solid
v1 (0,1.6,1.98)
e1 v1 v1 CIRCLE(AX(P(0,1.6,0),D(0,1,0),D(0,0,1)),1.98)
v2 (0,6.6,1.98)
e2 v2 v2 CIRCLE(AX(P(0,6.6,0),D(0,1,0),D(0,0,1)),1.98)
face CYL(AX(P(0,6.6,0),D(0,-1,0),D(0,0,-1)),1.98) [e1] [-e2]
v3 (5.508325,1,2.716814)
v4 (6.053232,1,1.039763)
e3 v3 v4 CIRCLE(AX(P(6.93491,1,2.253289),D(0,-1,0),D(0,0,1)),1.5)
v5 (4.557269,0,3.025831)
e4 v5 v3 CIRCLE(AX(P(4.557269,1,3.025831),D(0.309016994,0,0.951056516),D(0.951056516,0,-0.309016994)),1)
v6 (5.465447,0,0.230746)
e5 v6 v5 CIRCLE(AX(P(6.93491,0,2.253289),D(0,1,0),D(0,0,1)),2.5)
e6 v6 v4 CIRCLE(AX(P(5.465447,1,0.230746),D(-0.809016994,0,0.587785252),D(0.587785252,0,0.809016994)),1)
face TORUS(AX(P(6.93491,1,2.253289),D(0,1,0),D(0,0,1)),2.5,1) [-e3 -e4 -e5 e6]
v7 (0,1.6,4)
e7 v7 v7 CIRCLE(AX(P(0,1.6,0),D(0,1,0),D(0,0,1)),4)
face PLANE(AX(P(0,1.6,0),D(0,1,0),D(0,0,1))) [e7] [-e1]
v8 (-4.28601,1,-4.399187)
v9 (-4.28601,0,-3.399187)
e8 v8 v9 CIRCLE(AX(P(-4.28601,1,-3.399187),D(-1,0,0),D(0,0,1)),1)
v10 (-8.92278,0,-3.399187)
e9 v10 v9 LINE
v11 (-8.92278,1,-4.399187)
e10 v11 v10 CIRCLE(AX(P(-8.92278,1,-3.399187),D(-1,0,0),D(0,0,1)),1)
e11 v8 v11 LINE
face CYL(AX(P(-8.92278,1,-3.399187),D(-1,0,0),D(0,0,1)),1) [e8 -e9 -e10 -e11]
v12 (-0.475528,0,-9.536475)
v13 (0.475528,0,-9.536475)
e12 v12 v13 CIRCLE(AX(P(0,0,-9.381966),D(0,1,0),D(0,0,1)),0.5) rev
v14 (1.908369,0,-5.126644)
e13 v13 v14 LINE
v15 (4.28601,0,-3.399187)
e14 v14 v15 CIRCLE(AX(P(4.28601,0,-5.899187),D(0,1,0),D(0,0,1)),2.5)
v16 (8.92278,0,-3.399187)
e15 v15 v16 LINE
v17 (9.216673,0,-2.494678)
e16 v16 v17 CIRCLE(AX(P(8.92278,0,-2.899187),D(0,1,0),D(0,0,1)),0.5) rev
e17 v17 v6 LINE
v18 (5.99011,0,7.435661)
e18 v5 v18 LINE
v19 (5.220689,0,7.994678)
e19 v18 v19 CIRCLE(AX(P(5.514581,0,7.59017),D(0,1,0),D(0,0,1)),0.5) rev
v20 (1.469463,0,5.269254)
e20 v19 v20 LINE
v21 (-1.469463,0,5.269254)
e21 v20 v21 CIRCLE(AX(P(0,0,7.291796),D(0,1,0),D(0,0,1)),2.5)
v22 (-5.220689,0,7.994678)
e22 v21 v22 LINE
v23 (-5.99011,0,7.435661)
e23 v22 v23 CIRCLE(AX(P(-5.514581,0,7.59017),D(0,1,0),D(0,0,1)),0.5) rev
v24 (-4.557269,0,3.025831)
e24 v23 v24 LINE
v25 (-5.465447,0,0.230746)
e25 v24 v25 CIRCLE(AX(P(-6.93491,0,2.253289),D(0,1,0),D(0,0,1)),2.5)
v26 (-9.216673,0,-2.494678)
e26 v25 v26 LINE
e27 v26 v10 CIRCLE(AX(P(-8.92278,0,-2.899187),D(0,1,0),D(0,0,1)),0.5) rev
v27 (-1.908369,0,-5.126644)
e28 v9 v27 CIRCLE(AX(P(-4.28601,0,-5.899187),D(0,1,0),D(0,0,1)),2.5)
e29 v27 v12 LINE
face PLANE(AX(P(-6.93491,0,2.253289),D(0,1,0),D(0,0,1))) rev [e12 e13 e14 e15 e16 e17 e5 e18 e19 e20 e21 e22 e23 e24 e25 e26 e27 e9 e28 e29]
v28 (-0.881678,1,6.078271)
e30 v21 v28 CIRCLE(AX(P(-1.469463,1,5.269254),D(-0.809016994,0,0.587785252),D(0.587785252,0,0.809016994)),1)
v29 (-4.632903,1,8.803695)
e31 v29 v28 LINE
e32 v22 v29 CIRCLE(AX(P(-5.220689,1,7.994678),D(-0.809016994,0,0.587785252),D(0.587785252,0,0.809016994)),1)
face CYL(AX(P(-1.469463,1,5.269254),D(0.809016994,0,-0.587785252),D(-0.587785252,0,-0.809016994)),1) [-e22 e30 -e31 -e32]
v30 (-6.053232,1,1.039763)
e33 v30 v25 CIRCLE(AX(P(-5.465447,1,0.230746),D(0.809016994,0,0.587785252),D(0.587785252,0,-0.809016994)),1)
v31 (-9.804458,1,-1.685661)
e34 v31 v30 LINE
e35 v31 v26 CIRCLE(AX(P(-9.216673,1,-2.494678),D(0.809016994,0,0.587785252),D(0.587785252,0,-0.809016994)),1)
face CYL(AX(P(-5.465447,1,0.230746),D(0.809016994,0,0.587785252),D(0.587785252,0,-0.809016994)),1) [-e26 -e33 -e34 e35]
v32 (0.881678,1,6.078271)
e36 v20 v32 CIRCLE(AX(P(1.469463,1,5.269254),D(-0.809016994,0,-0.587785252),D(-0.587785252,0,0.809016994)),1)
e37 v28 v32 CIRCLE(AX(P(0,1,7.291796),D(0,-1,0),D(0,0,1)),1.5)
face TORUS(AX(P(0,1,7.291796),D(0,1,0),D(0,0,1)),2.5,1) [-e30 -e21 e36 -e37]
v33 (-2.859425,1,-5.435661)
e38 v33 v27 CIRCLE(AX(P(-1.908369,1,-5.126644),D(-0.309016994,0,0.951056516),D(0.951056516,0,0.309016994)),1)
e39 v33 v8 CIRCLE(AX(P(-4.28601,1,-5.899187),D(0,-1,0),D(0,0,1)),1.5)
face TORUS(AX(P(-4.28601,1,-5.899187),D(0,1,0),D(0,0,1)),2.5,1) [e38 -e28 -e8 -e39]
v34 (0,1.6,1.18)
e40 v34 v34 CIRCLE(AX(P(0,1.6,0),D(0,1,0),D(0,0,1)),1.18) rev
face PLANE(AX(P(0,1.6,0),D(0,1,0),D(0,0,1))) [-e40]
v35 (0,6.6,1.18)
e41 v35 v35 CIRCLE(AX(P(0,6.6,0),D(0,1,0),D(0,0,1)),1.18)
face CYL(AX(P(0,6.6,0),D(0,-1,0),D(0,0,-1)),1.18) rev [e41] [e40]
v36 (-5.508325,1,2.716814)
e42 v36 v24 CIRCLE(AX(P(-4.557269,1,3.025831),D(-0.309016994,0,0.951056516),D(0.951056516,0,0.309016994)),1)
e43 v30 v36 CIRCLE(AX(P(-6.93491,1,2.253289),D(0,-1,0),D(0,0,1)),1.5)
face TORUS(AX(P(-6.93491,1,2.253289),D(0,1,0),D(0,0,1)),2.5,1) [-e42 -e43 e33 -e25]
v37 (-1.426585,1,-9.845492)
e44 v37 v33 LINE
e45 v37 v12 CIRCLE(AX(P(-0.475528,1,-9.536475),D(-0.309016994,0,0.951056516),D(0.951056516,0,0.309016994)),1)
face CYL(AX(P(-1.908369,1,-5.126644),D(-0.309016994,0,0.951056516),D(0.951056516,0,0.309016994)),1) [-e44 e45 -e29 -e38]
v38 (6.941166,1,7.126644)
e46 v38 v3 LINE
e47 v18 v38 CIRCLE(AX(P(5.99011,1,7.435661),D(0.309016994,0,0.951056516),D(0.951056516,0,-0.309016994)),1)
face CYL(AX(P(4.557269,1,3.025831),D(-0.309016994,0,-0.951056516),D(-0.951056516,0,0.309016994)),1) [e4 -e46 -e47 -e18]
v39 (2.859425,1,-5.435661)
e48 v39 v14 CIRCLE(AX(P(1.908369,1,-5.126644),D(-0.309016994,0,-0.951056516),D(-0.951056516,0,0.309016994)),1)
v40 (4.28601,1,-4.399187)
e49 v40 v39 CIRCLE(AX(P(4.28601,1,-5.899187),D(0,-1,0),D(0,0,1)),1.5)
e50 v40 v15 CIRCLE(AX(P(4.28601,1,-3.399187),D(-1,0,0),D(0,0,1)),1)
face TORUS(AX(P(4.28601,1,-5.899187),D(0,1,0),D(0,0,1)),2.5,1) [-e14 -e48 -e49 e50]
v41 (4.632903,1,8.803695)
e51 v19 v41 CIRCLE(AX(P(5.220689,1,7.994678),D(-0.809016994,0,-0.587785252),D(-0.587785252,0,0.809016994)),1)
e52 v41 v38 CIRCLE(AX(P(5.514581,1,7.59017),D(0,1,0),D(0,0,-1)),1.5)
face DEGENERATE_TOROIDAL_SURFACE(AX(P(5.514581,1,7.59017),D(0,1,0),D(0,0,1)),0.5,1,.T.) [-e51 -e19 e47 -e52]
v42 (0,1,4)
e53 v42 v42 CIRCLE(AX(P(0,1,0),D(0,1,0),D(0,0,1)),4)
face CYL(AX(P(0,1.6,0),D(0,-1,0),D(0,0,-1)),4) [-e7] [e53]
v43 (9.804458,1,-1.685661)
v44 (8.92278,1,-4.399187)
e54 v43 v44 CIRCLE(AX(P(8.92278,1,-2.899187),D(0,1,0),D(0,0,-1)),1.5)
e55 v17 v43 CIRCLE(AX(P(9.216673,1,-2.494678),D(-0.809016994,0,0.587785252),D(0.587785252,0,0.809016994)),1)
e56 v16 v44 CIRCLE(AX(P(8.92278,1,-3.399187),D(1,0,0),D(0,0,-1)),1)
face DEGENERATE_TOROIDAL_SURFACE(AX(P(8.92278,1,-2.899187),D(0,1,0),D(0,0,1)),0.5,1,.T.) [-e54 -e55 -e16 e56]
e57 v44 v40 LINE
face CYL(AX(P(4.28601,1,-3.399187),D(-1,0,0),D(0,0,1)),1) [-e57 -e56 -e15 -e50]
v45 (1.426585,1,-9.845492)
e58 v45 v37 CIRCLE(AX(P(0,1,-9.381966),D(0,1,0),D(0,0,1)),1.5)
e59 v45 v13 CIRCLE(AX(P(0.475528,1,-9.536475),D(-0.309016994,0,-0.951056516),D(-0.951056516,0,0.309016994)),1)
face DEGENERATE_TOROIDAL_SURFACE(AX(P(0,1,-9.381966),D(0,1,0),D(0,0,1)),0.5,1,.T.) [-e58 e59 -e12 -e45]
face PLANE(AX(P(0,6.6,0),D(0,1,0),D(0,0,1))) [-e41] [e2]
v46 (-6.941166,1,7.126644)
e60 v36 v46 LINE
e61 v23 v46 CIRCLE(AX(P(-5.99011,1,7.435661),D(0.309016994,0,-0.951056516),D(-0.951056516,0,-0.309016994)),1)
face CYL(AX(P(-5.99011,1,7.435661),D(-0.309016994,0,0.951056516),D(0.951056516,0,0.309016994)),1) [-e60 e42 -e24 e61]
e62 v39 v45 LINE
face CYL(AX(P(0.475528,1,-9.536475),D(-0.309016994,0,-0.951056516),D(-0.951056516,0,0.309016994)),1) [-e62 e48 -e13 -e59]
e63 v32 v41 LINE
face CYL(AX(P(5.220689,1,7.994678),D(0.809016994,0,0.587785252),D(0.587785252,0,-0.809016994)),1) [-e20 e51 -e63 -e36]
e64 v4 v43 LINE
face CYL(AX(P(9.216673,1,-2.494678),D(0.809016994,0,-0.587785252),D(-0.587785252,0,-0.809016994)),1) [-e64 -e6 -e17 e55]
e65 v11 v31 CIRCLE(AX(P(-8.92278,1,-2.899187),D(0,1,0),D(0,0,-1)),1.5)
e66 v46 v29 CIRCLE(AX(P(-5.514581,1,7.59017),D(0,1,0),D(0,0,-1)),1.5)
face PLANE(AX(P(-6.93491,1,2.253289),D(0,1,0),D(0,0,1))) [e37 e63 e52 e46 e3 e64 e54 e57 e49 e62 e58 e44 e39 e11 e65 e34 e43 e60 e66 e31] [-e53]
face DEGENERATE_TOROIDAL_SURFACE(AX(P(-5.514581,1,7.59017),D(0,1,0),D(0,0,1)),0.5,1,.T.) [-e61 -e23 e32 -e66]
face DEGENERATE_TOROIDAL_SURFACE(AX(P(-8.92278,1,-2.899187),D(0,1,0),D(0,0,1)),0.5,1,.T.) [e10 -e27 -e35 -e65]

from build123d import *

# Parameters (mm, degrees)
SALIENTE_EXTRUIR1_DEPTH = 1
REDONDEO1_R             = 1
CROQUIS5_R              = 4
SALIENTE_EXTRUIR5_DEPTH = 0.6
CROQUIS2_R              = 1.98
CROQUIS2_R_2            = 1.18
SALIENTE_EXTRUIR2_DEPTH = 5


with BuildPart() as part:
    # Croquis1 → Saliente-Extruir1 (new body)
    with BuildSketch(Plane(origin=(0, 0, 0), x_dir=(1, 0, 0), z_dir=(0, 1, 0))):
        with BuildLine():
            Line((1.426584774, 9.845491503), (2.859425417, 5.435661447))
            ThreePointArc((2.859425417, 5.435661447), (3.404332313, 4.685661447), (4.286010191, 4.399186938))
            Line((4.286010191, 4.399186938), (8.922779911, 4.399186938))
            ThreePointArc((8.922779911, 4.399186938), (10.349364685, 3.36271243), (9.804457789, 1.685661447))
            Line((9.804457789, 1.685661447), (6.053232287, -1.039763413))
            ThreePointArc((6.053232287, -1.039763413), (5.508325391, -1.789763413), (5.508325391, -2.716814396))
            Line((5.508325391, -2.716814396), (6.941166033, -7.126644452))
            ThreePointArc((6.941166033, -7.126644452), (6.396259137, -8.803695435), (4.63290338, -8.803695435))
            Line((4.63290338, -8.803695435), (0.881677878, -6.078270576))
            ThreePointArc((0.881677878, -6.078270576), (0, -5.791796068), (-0.881677878, -6.078270576))
            Line((-0.881677878, -6.078270576), (-4.63290338, -8.803695435))
            ThreePointArc((-4.63290338, -8.803695435), (-6.396259137, -8.803695435), (-6.941166033, -7.126644452))
            Line((-6.941166033, -7.126644452), (-5.508325391, -2.716814396))
            ThreePointArc((-5.508325391, -2.716814396), (-5.508325391, -1.789763413), (-6.053232287, -1.039763413))
            Line((-6.053232287, -1.039763413), (-9.804457789, 1.685661447))
            ThreePointArc((-9.804457789, 1.685661447), (-10.349364685, 3.36271243), (-8.922779911, 4.399186938))
            Line((-8.922779911, 4.399186938), (-4.286010191, 4.399186938))
            ThreePointArc((-4.286010191, 4.399186938), (-3.404332313, 4.685661447), (-2.859425417, 5.435661447))
            Line((-2.859425417, 5.435661447), (-1.426584774, 9.845491503))
            ThreePointArc((-1.426584774, 9.845491503), (0, 10.881966011), (1.426584774, 9.845491503))
        make_face()
    extrude(amount=SALIENTE_EXTRUIR1_DEPTH)

    # Redondeo1
    redondeo1_edges = [part.edges().sort_by_distance(p)[0] for p in [
        (-6.224745712, 0, 4.921729424),
        (-6.396259137, 0, 8.803695435),
        (-2.757290629, 0, 7.440983006),
        (0, 0, 5.791796068),
        (2.757290629, 0, 7.440983006),
        (6.396259137, 0, 8.803695435),
        (6.224745712, 0, 4.921729424),
        (5.508325391, 0, 1.789763413),
        (7.928845038, 0, -0.322949017),
        (10.349364685, 0, -3.36271243),
        (6.604395051, 0, -4.399186938),
        (3.404332313, 0, -4.685661447),
        (2.143005096, 0, -7.640576475),
        (0, 0, -10.881966011),
        (-2.143005096, 0, -7.640576475),
        (-3.404332313, 0, -4.685661447),
        (-6.604395051, 0, -4.399186938),
        (-10.349364685, 0, -3.36271243),
        (-7.928845038, 0, -0.322949017),
        (-5.508325391, 0, 1.789763413),
    ]]
    fillet(redondeo1_edges, radius=REDONDEO1_R - 0.0001)  # a hair under: the kernel refuses the full size

    # Croquis5 → Saliente-Extruir5 (add)
    with BuildSketch(Plane(origin=(0, 1, 0), x_dir=(1, 0, 0), z_dir=(0, 1, 0))):
        with Locations(Location((0, 0, 0), (0, 0, 270))):
            Circle(CROQUIS5_R)
    extrude(amount=SALIENTE_EXTRUIR5_DEPTH)

    # Croquis2 → Saliente-Extruir2 (add)
    with BuildSketch(Plane(origin=(0, 1.6, 0), x_dir=(1, 0, 0), z_dir=(0, 1, 0))):
        with Locations(Location((0, 0, 0), (0, 0, 270))):
            Circle(CROQUIS2_R)
        with Locations(Location((0, 0, 0), (0, 0, 270))):
            Circle(CROQUIS2_R_2, mode=Mode.SUBTRACT)
    extrude(amount=SALIENTE_EXTRUIR2_DEPTH)


solid = part.part
